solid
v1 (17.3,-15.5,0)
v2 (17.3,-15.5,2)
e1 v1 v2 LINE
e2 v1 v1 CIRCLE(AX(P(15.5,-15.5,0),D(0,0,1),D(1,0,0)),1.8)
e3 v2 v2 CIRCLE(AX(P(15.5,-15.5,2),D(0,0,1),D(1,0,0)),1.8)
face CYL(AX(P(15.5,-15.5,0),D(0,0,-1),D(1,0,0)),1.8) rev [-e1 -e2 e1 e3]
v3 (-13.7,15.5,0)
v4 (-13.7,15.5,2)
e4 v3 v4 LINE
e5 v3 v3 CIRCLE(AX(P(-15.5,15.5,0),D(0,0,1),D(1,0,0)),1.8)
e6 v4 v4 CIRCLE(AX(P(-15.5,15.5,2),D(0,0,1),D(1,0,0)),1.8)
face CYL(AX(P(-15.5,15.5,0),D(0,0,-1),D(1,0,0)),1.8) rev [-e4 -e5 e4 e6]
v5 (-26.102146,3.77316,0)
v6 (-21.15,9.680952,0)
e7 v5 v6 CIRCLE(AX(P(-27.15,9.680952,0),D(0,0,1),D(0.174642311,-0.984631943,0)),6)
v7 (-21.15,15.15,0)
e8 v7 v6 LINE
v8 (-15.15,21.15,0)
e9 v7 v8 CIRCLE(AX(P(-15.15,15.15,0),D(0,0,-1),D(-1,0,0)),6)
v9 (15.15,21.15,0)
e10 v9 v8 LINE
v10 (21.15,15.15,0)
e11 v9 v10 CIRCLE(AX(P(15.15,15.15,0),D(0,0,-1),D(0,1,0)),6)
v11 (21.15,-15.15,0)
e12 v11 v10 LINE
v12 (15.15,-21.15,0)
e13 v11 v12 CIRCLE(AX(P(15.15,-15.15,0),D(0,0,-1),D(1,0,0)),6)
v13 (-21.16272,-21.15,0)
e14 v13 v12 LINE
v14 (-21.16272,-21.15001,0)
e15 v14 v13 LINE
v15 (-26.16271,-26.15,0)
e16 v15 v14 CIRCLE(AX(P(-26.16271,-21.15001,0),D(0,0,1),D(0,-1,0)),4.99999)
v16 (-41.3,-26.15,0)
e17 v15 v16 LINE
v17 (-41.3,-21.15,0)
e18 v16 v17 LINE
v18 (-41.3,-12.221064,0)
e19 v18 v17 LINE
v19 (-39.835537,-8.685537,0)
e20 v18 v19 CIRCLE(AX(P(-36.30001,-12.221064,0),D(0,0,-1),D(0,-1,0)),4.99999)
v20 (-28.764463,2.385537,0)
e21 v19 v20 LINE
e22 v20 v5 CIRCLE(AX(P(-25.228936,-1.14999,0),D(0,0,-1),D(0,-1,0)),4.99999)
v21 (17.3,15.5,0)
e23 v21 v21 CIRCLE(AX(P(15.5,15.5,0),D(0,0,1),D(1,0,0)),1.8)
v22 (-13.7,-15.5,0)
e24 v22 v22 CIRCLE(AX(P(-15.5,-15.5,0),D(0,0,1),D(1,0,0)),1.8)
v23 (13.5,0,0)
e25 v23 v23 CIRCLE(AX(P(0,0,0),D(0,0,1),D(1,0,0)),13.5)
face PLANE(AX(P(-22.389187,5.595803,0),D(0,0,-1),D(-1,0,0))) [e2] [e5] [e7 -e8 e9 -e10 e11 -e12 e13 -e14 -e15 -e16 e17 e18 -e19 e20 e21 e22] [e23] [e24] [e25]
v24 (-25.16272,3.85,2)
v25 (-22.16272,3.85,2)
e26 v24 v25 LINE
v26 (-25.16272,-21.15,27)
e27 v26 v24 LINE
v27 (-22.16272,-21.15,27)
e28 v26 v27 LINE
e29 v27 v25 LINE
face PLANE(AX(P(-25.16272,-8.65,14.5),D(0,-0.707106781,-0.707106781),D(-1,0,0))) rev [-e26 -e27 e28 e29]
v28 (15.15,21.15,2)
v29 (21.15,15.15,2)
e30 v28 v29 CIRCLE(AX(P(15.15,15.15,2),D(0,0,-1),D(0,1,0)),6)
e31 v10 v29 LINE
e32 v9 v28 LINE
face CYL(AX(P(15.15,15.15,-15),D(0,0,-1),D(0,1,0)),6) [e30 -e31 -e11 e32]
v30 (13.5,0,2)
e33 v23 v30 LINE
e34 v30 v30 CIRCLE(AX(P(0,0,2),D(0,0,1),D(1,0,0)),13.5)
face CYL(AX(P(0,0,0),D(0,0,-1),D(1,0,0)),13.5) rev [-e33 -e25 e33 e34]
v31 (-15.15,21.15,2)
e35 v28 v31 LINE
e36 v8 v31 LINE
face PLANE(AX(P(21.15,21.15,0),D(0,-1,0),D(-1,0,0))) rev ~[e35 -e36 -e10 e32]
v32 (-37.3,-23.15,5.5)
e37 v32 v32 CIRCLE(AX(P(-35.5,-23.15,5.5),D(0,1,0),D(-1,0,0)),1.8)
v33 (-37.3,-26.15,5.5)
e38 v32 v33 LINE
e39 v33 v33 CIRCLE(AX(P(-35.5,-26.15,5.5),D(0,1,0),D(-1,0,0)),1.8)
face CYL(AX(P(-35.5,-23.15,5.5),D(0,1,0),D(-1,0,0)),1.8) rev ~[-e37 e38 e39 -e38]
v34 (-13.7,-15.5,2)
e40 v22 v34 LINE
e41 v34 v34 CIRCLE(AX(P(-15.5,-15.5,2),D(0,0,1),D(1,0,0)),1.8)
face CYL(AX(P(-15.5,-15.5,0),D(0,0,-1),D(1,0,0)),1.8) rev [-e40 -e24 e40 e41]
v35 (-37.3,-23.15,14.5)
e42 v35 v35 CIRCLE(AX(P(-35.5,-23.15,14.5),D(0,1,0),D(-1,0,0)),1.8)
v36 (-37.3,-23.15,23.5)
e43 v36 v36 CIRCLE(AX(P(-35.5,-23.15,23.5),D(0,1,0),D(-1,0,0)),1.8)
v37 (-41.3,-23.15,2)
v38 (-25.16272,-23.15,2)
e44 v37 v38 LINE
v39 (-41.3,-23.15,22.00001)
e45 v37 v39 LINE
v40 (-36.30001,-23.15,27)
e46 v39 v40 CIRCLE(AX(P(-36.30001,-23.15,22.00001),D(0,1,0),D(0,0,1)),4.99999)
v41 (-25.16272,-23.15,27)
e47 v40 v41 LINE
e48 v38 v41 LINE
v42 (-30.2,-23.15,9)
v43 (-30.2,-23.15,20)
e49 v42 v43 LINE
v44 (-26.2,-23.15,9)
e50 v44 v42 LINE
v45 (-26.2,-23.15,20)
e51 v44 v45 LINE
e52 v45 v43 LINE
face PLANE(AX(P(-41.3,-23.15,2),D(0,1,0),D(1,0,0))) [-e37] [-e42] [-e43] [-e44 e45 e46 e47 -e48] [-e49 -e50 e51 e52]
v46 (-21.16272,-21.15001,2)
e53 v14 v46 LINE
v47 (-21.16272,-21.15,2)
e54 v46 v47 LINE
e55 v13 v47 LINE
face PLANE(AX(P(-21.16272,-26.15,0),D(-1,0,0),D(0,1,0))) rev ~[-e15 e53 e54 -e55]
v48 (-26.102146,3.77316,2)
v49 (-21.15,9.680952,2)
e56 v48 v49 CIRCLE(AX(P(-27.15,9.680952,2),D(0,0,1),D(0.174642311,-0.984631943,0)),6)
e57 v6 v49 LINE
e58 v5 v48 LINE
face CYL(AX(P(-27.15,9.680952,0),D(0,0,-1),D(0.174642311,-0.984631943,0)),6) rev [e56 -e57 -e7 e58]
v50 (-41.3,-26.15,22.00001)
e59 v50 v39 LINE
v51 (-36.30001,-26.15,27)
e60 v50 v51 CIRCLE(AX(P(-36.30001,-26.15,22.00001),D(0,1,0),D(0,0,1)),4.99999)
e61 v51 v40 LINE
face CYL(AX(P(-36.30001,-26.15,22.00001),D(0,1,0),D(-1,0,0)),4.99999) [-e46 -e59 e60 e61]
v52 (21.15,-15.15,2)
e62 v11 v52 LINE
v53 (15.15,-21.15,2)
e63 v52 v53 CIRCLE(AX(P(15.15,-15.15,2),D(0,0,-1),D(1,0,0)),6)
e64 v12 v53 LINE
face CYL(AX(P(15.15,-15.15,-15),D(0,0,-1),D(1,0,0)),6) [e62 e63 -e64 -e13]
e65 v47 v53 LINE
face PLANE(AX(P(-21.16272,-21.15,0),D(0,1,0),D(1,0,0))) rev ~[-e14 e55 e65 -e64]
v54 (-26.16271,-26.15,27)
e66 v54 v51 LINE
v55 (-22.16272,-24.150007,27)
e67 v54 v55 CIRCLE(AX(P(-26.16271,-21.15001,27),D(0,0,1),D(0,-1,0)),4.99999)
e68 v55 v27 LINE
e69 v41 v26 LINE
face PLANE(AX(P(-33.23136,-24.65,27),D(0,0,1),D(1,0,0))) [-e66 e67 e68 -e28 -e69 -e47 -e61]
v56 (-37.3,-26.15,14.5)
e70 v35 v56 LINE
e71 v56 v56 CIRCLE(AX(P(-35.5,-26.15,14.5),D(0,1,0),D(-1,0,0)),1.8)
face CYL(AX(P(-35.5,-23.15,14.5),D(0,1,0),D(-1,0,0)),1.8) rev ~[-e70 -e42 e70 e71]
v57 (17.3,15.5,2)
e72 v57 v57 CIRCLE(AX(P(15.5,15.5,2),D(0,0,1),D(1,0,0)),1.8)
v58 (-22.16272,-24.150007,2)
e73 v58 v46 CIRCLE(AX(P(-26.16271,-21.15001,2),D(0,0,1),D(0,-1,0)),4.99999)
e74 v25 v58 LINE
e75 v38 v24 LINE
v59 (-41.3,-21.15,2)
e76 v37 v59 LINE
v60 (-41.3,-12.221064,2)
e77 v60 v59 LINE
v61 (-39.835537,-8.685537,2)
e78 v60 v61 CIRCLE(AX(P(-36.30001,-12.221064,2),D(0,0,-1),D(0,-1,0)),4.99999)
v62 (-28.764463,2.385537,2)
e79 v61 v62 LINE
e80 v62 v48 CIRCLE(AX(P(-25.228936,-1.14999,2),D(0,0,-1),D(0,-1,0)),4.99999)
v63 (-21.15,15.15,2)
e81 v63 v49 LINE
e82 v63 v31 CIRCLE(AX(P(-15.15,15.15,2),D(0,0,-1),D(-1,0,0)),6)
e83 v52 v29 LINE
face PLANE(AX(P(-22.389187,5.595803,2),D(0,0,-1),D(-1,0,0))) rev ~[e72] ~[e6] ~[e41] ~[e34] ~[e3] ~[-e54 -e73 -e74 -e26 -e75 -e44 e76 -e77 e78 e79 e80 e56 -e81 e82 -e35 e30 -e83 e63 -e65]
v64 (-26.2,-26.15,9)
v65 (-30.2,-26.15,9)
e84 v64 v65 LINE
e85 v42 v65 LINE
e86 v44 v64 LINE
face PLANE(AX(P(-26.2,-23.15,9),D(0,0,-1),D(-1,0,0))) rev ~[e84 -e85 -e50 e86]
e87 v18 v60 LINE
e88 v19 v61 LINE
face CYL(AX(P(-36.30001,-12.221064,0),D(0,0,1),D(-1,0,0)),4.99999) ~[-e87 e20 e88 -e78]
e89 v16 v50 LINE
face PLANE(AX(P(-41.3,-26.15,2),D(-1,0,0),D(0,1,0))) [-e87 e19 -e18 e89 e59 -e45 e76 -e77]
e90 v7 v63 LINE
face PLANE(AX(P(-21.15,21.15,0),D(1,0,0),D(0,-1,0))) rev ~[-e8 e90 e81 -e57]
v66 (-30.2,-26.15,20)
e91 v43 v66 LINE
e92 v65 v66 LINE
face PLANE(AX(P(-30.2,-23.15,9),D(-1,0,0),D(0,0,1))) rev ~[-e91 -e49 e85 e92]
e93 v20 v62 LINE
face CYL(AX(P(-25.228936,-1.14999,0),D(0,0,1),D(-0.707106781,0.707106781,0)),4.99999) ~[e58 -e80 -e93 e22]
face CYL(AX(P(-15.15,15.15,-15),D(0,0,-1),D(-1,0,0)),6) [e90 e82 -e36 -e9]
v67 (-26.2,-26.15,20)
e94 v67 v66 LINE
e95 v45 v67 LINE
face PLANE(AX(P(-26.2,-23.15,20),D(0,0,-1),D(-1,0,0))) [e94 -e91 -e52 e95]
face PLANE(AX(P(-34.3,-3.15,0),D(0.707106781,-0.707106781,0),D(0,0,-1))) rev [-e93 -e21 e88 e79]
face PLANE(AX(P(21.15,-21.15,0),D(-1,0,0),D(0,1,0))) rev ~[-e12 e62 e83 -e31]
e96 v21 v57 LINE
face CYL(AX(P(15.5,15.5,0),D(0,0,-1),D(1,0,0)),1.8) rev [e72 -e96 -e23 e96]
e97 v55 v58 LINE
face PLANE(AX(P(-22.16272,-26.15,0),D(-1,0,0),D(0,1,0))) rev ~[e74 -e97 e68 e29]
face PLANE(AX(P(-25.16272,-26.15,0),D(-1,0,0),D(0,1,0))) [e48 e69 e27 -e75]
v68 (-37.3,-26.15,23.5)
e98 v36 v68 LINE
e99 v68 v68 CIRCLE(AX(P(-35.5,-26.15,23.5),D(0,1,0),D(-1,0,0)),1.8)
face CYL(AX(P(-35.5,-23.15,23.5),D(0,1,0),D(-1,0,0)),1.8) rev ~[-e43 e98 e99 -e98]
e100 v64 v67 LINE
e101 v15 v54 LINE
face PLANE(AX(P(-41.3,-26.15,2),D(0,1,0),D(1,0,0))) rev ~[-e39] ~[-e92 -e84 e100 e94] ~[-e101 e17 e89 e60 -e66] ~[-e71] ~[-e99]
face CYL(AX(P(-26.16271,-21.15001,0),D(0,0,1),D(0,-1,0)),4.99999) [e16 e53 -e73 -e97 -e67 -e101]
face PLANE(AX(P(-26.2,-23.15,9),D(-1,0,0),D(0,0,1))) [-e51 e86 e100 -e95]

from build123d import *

# Parameters (mm, degrees)
F0_R         = 1.8
F0_R_2       = 13.5
F0_W         = 20.1372796029
F0_H         = 5
F1_DEPTH     = 2
F2_W         = 3
F2_H         = 30
F3_DEPTH     = 27
F4_W         = 16.1372796029
F4_H         = 3
F5_DEPTH     = 25
F6_R         = 1.8
F6_W         = 4
F6_H         = 11
F7_DEPTH     = 25
F8_SIZE      = 25
F9_SIZE      = 14
F10_R        = 4.99999
F11_T1_DEPTH = 2
F11_T3_DEPTH = 32


# Not quite as in the source:
# - a fillet or chamfer that OpenCascade refuses, or shapes differently, is made with other operations: its cross-section is extruded or revolved along the edge and cut away or added
# - a fillet or chamfer is up to 0.001 mm smaller than in the source, because OpenCascade refuses the exact size


with BuildPart() as f1:
    # F0 (on Top) → F1 (new body)
    with BuildSketch(Plane.XY):
        Polygon((21.15, -21.15), (21.15, 21.15), (-21.15, 21.15), (-21.15, 3.85), (-21.15, -21.15), align=None)
        with Locations((-15.5, -15.5)):
            Circle(F0_R, mode=Mode.SUBTRACT)
        with Locations((15.5, -15.5)):
            Circle(F0_R, mode=Mode.SUBTRACT)
        with Locations((-15.5, 15.5)):
            Circle(F0_R, mode=Mode.SUBTRACT)
        Circle(F0_R_2, mode=Mode.SUBTRACT)
        with Locations((15.5, 15.5)):
            Circle(F0_R, mode=Mode.SUBTRACT)
        Polygon((-21.15, -21.15), (-21.15, 3.85), (-41.3, 3.85), (-41.3, -21.15), (-21.1627203971, -21.15), align=None)
        with Locations((-31.2313601986, -23.65)):
            Rectangle(F0_W, F0_H)
    extrude(amount=F1_DEPTH)

    # F2 (on Top) → F3 (join)
    with BuildSketch(Plane.XY):
        with Locations((-23.6627203971, -11.15)):
            Rectangle(F2_W, F2_H)
    extrude(amount=F3_DEPTH)

    # F4 (on face) → F5 (join)
    with BuildSketch(Plane.XY.offset(2)):
        with Locations((-33.2313601986, -24.65)):
            Rectangle(F4_W, F4_H)
    extrude(amount=F5_DEPTH)

    # F6 (on face) → F7 (cut)
    with BuildSketch(Plane(origin=(0, -23.15, 0), x_dir=(-1, 0, 0), z_dir=(0, 1, 0))):
        with Locations((35.5, 14.5)):
            Circle(F6_R)
        with Locations((35.5, 5.5)):
            Circle(F6_R)
        with Locations((35.5, 23.5)):
            Circle(F6_R)
        with Locations((28.2, 14.5)):
            Rectangle(F6_W, F6_H)
    extrude(amount=-F7_DEPTH, mode=Mode.SUBTRACT)

    # F8
    f8_edges = [f1.edges().sort_by_distance(p)[0] for p in [
        (-23.66272, 3.85, 27),
    ]]
    chamfer(f8_edges, length=F8_SIZE)

    # F9
    f9_edges = [f1.edges().sort_by_distance(p)[0] for p in [
        (-41.3, 3.85, 1),
    ]]
    chamfer(f9_edges, length=F9_SIZE)

    # F10 (radius 5 in the source; OpenCascade refuses exactly that, so slightly less here)
    f10_edges = [f1.edges().sort_by_distance(p)[0] for p in [
        (-41.3, -10.15, 1),
        (-27.3, 3.85, 1),
        (-21.16272, -26.15, 1),
        (-41.3, -24.65, 27),
    ]]
    fillet(f10_edges, radius=F10_R)

    # F11: fillet of radius 6 on 4 edges, made by hand

    # F11_s2 → F11_t1 (join)
    with BuildSketch(Plane.XY):
        with BuildLine():
            ThreePointArc((-26.1021461366, 3.7731598692), (-22.5517871308, 5.8265464621), (-21.15, 9.6809515277))
            Line((-21.15, 9.6809515277), (-20.55, 9.6809515277))
            Line((-20.55, 9.6809515277), (-20.55, 3.85))
            Line((-20.55, 3.85), (-21.15, 3.25))
            ThreePointArc((-21.15, 3.25), (-25.2289363303, 3.25), (-25.9973607503, 3.1823807033))
            Line((-25.9973607503, 3.1823807033), (-26.1021461366, 3.7731598692))
        make_face()
    extrude(amount=F11_T1_DEPTH)

    # F11_s4 → F11_t3 (cut)
    with BuildSketch(Plane.XY.offset(-15)):
        with BuildLine():
            ThreePointArc((21.15, -15.15), (19.3926406871, -19.3926406871), (15.15, -21.15))
            Line((15.15, -21.15), (21.15, -21.15))
            Line((21.15, -21.15), (21.15, -15.15))
        make_face()
        with BuildLine():
            ThreePointArc((15.15, 21.15), (19.3926406871, 19.3926406871), (21.15, 15.15))
            Line((21.15, 15.15), (21.15, 21.15))
            Line((21.15, 21.15), (15.15, 21.15))
        make_face()
        with BuildLine():
            ThreePointArc((-21.15, 15.15), (-19.3926406871, 19.3926406871), (-15.15, 21.15))
            Line((-15.15, 21.15), (-21.15, 21.15))
            Line((-21.15, 21.15), (-21.15, 15.15))
        make_face()
    extrude(amount=F11_T3_DEPTH, mode=Mode.SUBTRACT)


solid = f1.part
